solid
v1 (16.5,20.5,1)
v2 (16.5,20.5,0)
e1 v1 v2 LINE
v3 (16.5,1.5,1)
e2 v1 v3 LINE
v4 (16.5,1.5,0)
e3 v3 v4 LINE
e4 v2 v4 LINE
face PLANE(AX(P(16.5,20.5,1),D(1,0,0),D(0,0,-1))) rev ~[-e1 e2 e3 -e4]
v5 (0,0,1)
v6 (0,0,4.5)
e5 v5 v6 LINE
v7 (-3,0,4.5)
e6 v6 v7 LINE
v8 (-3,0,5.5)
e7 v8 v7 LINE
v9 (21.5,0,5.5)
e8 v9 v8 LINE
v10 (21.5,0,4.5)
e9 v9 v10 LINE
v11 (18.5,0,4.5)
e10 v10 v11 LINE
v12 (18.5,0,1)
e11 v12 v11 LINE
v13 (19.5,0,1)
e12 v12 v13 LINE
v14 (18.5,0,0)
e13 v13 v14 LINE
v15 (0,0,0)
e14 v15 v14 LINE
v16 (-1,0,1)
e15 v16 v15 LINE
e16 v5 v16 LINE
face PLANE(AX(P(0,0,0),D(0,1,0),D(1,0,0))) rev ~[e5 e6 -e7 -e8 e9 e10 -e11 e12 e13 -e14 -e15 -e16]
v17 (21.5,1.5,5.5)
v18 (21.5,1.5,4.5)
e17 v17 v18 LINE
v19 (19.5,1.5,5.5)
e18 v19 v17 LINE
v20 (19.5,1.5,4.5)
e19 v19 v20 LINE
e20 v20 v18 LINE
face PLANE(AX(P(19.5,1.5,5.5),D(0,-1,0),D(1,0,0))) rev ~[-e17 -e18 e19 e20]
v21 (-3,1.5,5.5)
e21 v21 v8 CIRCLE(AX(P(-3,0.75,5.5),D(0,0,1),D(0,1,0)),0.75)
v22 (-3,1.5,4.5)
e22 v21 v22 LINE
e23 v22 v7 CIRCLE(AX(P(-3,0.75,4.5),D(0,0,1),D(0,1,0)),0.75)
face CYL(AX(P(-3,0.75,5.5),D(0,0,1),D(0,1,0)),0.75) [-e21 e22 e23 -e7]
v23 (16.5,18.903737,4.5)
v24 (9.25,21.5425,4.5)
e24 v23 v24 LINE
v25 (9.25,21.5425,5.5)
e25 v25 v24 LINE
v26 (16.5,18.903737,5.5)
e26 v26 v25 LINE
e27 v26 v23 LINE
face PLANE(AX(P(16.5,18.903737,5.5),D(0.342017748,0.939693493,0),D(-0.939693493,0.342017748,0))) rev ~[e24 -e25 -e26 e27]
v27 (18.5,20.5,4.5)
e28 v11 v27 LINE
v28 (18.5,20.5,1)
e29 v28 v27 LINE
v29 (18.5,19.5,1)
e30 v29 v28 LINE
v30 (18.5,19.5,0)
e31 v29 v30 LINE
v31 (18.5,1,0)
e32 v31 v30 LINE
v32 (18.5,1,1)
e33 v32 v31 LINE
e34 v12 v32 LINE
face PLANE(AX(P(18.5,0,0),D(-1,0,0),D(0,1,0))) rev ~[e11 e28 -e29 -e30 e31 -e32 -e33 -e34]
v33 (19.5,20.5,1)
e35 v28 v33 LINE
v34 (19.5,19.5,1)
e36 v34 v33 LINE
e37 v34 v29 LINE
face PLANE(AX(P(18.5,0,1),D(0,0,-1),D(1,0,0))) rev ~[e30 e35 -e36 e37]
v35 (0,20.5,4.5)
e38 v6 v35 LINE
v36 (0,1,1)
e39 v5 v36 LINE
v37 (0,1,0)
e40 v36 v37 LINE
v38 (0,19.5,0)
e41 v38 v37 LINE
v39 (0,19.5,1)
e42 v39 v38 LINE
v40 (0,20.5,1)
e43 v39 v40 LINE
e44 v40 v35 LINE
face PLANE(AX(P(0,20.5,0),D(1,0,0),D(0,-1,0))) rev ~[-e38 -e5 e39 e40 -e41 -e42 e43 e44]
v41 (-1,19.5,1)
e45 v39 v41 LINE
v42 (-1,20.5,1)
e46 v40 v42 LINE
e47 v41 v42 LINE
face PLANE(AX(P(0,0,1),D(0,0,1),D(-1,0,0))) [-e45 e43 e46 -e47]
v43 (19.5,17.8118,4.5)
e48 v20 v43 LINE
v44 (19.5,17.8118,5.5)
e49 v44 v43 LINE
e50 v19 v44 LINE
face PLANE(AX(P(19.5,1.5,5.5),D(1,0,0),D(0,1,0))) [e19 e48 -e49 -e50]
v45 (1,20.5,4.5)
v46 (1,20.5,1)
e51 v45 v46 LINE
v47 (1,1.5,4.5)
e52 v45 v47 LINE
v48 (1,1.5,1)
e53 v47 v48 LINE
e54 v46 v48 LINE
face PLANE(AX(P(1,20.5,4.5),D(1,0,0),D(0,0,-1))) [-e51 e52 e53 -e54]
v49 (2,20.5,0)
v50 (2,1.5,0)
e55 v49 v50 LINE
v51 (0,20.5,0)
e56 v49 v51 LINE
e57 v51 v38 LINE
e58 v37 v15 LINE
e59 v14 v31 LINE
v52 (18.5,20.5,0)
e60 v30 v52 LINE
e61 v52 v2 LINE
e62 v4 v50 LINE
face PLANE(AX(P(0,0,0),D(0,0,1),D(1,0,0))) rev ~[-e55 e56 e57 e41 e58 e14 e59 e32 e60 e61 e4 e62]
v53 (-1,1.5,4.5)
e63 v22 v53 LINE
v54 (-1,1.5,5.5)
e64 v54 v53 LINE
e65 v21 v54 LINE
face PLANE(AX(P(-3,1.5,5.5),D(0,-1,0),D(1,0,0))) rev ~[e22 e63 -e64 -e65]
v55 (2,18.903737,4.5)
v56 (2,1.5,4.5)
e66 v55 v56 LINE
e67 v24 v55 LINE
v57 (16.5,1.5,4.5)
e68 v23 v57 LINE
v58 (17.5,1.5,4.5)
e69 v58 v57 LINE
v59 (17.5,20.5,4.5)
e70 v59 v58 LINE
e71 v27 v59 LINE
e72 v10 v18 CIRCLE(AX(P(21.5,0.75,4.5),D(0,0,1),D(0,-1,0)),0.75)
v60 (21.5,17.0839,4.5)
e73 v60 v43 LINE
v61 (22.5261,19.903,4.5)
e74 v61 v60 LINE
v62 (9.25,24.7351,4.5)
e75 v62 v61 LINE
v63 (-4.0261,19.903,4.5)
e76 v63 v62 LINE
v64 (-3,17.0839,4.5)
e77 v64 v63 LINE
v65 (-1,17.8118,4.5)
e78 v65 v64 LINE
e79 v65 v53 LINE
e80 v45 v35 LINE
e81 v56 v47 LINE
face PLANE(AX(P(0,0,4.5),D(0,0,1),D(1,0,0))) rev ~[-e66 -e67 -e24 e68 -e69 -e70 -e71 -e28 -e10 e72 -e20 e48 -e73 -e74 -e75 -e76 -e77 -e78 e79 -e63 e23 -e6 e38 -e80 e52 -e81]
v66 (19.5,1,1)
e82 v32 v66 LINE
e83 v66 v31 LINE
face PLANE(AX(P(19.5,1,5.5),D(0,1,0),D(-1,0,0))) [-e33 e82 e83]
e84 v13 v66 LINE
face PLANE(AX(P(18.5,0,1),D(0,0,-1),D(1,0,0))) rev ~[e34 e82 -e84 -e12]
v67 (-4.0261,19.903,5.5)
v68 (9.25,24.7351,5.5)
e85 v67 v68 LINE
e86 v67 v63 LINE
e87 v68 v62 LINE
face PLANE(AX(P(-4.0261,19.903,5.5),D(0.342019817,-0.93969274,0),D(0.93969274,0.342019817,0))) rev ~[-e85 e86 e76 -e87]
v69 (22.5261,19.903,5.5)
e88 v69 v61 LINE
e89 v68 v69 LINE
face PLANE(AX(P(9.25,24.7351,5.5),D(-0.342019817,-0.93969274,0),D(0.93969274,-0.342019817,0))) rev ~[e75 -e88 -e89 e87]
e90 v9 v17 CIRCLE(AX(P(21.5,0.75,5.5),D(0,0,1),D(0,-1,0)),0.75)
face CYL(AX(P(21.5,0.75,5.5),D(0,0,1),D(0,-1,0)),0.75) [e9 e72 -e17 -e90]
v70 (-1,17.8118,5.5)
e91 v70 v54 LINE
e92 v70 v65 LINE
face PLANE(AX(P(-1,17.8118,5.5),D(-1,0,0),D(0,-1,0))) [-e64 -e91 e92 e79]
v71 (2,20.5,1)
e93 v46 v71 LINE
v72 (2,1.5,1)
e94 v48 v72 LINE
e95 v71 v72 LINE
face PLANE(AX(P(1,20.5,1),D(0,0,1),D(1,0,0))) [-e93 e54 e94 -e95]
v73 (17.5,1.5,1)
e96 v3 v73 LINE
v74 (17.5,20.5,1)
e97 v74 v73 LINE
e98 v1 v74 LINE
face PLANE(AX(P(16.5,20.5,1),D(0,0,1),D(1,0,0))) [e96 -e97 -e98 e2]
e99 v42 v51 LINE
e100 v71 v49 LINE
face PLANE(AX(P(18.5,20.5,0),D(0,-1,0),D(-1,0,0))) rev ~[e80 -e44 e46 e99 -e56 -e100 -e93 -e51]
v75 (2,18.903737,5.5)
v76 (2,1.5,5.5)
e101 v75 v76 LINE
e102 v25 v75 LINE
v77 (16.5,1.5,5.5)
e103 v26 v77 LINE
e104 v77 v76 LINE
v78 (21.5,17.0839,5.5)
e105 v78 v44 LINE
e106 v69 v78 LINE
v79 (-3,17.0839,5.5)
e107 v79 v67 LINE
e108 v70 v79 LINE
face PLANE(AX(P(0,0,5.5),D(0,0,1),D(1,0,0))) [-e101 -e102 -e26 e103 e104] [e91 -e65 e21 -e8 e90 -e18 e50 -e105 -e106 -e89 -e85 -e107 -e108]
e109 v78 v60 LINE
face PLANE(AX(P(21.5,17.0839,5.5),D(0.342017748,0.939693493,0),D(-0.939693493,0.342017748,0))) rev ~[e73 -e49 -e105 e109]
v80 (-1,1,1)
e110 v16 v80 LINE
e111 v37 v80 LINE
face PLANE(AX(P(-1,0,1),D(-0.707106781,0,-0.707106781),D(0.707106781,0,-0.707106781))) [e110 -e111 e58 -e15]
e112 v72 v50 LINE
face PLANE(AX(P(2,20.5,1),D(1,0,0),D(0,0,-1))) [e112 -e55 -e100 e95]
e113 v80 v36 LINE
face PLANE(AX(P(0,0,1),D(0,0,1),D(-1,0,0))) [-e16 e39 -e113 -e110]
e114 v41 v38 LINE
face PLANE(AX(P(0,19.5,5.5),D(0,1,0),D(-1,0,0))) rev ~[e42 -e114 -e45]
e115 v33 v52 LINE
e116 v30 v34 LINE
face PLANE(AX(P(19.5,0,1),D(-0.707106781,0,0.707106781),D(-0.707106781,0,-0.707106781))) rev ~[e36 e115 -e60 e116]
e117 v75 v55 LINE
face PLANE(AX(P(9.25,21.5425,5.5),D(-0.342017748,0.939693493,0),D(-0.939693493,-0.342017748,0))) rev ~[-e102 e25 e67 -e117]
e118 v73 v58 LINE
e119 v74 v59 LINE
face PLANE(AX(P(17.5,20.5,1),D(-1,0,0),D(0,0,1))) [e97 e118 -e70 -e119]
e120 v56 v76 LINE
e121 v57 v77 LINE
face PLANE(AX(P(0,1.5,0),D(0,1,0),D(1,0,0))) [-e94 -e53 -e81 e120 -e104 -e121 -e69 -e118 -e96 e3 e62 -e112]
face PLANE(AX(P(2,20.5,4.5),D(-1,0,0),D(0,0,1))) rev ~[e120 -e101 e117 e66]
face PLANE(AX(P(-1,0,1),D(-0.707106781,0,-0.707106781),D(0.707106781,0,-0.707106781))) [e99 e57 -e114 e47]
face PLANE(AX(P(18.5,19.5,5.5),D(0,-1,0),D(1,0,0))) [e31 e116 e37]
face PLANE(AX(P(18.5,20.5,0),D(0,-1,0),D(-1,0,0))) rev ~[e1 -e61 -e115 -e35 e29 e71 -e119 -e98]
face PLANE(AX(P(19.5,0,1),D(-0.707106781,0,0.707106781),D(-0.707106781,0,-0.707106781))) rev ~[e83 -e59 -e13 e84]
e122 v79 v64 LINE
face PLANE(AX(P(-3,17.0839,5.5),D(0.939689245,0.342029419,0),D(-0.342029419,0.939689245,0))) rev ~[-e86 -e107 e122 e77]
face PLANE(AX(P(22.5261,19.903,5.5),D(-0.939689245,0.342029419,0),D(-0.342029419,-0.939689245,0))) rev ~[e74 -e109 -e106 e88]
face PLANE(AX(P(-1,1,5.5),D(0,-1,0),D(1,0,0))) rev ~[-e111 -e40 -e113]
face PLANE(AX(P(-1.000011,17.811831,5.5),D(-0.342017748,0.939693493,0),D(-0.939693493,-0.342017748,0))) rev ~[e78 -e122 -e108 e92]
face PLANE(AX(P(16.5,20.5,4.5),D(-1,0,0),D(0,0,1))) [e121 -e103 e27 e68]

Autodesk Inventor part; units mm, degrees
ref_plane "YZ Plane" through (0, 0, 0) normal (1, 0, 0) x (0, 1, 0)
ref_plane "XZ Plane" through (0, 0, 0) normal (0, 1, 0) x (-1, 0, 0)
ref_plane "XY Plane" through (0, 0, 0) normal (0, 0, 1) x (1, 0, 0)
sketch "Skizze1" plane through (0, 0, 0) normal (0, 0, 1) x (1, 0, 0)
  line L0 (0, 0) -> (18.5, 0)
  line L1 (18.5, 0) -> (18.5, 20.5)
  line L2 (18.5, 20.5) -> (0, 20.5)
  line L3 (0, 20.5) -> (0, 0)
  dimension "d0" = 18.5
  dimension "d1" = 20.5
extrude "Extrusion1" add sketch "Skizze1" along normal blind 5.5
sketch "Skizze2" plane through (0, 20.5, 0) normal (0, 1, 0) x (1, 0, 0)
  line L0 (18.5, 0) -> (0, 0) projected
  line L1 (0, 0) -> (0, -5.5) projected
  line L2 (18.5, -5.5) -> (0, -5.5) projected
  line L3 (18.5, 0) -> (18.5, -5.5) projected
  line L4 (1, -1) -> (17.5, -1)
  line L5 (17.5, -1) -> (17.5, -4.5)
  line L6 (17.5, -4.5) -> (1, -4.5)
  line L7 (1, -4.5) -> (1, -1)
  line L8 (2, -4.5) -> (2, -5.5)
  line L9 (18.5, -5.5) -> (0, -5.5) projected
  line L10 (16.5, -4.5) -> (16.5, -5.5)
  line L11 (16.5, -1) -> (16.5, 0)
  line L12 (18.5, 0) -> (0, 0) projected
  line L13 (2, -1) -> (2, 0)
  point P0 (1, -2.75)
  point P1 (0, -2.75)
  point P2 (9.25, -1)
  point P3 (9.25, 0)
  point P4 (16.5, -5.5)
  point P5 (2, -5.5)
  point P6 (2, 0)
  point P7 (16.5, 0)
  dimension "d4" = 3.5
  dimension "d5" = 1
  dimension "d8" = 2
  dimension "d9" = 2
extrude "Extrusion2" cut sketch "Skizze2" against normal blind 19 contours L11 L4 L13 L0 | L4 L5 L6 L7 | L2 L8 L6 L10
sketch "Skizze3" plane through (0, 0, 0) normal (0, -1, 0) x (1, 0, 0)
  line L0 (0, 0) -> (18.5, 0) projected
  line L1 (18.5, 0) -> (18.5, 5.5) projected
  line L2 (0, 5.5) -> (18.5, 5.5) projected
  line L3 (0, 0) -> (0, 5.5) projected
  line L4 (0, 0) -> (0, 5.5) projected
  line L5 (0, 1) -> (-1, 1)
  line L6 (-1, 1) -> (0, 0)
  line L7 (18.5, 0) -> (18.5, 5.5) projected
  line L8 (18.5, 1) -> (19.5, 1)
  line L9 (19.5, 1) -> (18.5, 0)
  dimension "d10" = 1
  dimension "d11" = 1
extrude "Extrusion3" add sketch "Skizze3" against normal up to surface (20.5 mm away) contours L6 L5 L3 | L1 L8 L9
sketch "Skizze4" plane through (0, 0, 5.5) normal (0, 0, 1) x (1, 0, 0)
  line L0 (16.5, 20.5) -> (16.5, 1.5) projected
  line L1 (16.5, 1.5) -> (2, 1.5) projected
  line L2 (2, 1.5) -> (2, 20.5) projected
  line L3 (2, 20.5) -> (0, 20.5) projected
  line L4 (0, 20.5) -> (0, 0) projected
  line L5 (0, 0) -> (18.5, 0) projected
  line L6 (18.5, 0) -> (18.5, 20.5) projected
  line L7 (18.5, 20.5) -> (16.5, 20.5) projected
  line L8 (0, 20.5) -> (0, 0) projected
  line L9 (-1, 0) -> (-1, 20.5) projected
  line L10 (0, 19.5) -> (-1, 19.5)
  line L11 (-1, 19.5) -> (-1, 1)
  line L12 (-1, 1) -> (0, 1)
  line L13 (0, 1) -> (0, 19.5)
  line L14 (18.5, 0) -> (18.5, 20.5) projected
  line L15 (19.5, 0) -> (19.5, 20.5) projected
  line L16 (18.5, 19.5) -> (19.5, 19.5)
  line L17 (19.5, 19.5) -> (19.5, 1)
  line L18 (19.5, 1) -> (18.5, 1)
  line L19 (18.5, 1) -> (18.5, 19.5)
  line L20 (0, 20.5) -> (-1, 20.5) projected
  point P0 (0, 10.25)
  point P1 (18.5, 10.25)
  dimension "d14" = 1
extrude "Extrusion4" cut sketch "Skizze4" against normal through all contours L16 L15 L18 L6 | L4 L12 L9 L10
sketch "Skizze5" plane through (0, 0, 5.5) normal (0, 0, 1) x (1, 0, 0)
  line L0 (16.5, 20.5) -> (16.5, 1.5) projected
  line L1 (16.5, 1.5) -> (2, 1.5) projected
  line L2 (2, 1.5) -> (2, 20.5) projected
  line L3 (2, 20.5) -> (0, 20.5) projected
  line L4 (0, 20.5) -> (0, 0) projected
  line L5 (0, 0) -> (18.5, 0) projected
  line L6 (18.5, 0) -> (18.5, 20.5) projected
  line L7 (18.5, 20.5) -> (16.5, 20.5) projected
  line L8 (-3, 1.5) -> (21.5, 1.5)
  line L9 (21.5, 0) -> (-3, 0)
  arc A0 (-3, 1.5) -> (-3, 0) centre (-3, 0.75) ccw
  arc A1 (21.5, 0) -> (21.5, 1.5) centre (21.5, 0.75) ccw
  line L10 (-3, 17.0839) -> (-4.0261, 19.903)
  line L11 (-4.0261, 19.903) -> (9.25, 24.7351)
  line L12 (9.25, 24.7351) -> (22.5261, 19.903)
  line L13 (22.5261, 19.903) -> (21.5, 17.0839)
  line L14 (21.5, 17.0839) -> (9.25, 21.5425)
  line L15 (9.25, 21.5425) -> (-3, 17.0839)
  line L16 (16.5, 1.5) -> (2, 1.5) projected
  line L17 (-1, 17.8118) -> (-1, 1.5)
  line L18 (19.5, 1.5) -> (19.5, 17.8118)
  line L19 (2.513, 19.0905) -> (1.487, 21.9095) construction
  point P0 (9.25, 1.5)
  point P1 (18.5, 1.5)
  point P2 (0, 1.5)
  point P3 (9.25, 1.5)
  point P4 (2, 18.9037)
  point P5 (16.5, 18.9037)
  dimension "d18" = 3
  dimension "d31" = 20
  dimension "d32" = 3
  dimension "d33" = 1
extrude "Extrusion5" add sketch "Skizze5" against normal blind 1 contours L0 L14 L15 L2 L3 L4 L10 L11 L12 L13 L6 L7 | L8 L6 L5 L4 L1 | L14 L18 L8 L6 | L8 A1 L9 L6 | L8 L17 L15 L4 | L4 L9 A0 L8
equation "\"d9\" = d8"
properties part number "window_test"
